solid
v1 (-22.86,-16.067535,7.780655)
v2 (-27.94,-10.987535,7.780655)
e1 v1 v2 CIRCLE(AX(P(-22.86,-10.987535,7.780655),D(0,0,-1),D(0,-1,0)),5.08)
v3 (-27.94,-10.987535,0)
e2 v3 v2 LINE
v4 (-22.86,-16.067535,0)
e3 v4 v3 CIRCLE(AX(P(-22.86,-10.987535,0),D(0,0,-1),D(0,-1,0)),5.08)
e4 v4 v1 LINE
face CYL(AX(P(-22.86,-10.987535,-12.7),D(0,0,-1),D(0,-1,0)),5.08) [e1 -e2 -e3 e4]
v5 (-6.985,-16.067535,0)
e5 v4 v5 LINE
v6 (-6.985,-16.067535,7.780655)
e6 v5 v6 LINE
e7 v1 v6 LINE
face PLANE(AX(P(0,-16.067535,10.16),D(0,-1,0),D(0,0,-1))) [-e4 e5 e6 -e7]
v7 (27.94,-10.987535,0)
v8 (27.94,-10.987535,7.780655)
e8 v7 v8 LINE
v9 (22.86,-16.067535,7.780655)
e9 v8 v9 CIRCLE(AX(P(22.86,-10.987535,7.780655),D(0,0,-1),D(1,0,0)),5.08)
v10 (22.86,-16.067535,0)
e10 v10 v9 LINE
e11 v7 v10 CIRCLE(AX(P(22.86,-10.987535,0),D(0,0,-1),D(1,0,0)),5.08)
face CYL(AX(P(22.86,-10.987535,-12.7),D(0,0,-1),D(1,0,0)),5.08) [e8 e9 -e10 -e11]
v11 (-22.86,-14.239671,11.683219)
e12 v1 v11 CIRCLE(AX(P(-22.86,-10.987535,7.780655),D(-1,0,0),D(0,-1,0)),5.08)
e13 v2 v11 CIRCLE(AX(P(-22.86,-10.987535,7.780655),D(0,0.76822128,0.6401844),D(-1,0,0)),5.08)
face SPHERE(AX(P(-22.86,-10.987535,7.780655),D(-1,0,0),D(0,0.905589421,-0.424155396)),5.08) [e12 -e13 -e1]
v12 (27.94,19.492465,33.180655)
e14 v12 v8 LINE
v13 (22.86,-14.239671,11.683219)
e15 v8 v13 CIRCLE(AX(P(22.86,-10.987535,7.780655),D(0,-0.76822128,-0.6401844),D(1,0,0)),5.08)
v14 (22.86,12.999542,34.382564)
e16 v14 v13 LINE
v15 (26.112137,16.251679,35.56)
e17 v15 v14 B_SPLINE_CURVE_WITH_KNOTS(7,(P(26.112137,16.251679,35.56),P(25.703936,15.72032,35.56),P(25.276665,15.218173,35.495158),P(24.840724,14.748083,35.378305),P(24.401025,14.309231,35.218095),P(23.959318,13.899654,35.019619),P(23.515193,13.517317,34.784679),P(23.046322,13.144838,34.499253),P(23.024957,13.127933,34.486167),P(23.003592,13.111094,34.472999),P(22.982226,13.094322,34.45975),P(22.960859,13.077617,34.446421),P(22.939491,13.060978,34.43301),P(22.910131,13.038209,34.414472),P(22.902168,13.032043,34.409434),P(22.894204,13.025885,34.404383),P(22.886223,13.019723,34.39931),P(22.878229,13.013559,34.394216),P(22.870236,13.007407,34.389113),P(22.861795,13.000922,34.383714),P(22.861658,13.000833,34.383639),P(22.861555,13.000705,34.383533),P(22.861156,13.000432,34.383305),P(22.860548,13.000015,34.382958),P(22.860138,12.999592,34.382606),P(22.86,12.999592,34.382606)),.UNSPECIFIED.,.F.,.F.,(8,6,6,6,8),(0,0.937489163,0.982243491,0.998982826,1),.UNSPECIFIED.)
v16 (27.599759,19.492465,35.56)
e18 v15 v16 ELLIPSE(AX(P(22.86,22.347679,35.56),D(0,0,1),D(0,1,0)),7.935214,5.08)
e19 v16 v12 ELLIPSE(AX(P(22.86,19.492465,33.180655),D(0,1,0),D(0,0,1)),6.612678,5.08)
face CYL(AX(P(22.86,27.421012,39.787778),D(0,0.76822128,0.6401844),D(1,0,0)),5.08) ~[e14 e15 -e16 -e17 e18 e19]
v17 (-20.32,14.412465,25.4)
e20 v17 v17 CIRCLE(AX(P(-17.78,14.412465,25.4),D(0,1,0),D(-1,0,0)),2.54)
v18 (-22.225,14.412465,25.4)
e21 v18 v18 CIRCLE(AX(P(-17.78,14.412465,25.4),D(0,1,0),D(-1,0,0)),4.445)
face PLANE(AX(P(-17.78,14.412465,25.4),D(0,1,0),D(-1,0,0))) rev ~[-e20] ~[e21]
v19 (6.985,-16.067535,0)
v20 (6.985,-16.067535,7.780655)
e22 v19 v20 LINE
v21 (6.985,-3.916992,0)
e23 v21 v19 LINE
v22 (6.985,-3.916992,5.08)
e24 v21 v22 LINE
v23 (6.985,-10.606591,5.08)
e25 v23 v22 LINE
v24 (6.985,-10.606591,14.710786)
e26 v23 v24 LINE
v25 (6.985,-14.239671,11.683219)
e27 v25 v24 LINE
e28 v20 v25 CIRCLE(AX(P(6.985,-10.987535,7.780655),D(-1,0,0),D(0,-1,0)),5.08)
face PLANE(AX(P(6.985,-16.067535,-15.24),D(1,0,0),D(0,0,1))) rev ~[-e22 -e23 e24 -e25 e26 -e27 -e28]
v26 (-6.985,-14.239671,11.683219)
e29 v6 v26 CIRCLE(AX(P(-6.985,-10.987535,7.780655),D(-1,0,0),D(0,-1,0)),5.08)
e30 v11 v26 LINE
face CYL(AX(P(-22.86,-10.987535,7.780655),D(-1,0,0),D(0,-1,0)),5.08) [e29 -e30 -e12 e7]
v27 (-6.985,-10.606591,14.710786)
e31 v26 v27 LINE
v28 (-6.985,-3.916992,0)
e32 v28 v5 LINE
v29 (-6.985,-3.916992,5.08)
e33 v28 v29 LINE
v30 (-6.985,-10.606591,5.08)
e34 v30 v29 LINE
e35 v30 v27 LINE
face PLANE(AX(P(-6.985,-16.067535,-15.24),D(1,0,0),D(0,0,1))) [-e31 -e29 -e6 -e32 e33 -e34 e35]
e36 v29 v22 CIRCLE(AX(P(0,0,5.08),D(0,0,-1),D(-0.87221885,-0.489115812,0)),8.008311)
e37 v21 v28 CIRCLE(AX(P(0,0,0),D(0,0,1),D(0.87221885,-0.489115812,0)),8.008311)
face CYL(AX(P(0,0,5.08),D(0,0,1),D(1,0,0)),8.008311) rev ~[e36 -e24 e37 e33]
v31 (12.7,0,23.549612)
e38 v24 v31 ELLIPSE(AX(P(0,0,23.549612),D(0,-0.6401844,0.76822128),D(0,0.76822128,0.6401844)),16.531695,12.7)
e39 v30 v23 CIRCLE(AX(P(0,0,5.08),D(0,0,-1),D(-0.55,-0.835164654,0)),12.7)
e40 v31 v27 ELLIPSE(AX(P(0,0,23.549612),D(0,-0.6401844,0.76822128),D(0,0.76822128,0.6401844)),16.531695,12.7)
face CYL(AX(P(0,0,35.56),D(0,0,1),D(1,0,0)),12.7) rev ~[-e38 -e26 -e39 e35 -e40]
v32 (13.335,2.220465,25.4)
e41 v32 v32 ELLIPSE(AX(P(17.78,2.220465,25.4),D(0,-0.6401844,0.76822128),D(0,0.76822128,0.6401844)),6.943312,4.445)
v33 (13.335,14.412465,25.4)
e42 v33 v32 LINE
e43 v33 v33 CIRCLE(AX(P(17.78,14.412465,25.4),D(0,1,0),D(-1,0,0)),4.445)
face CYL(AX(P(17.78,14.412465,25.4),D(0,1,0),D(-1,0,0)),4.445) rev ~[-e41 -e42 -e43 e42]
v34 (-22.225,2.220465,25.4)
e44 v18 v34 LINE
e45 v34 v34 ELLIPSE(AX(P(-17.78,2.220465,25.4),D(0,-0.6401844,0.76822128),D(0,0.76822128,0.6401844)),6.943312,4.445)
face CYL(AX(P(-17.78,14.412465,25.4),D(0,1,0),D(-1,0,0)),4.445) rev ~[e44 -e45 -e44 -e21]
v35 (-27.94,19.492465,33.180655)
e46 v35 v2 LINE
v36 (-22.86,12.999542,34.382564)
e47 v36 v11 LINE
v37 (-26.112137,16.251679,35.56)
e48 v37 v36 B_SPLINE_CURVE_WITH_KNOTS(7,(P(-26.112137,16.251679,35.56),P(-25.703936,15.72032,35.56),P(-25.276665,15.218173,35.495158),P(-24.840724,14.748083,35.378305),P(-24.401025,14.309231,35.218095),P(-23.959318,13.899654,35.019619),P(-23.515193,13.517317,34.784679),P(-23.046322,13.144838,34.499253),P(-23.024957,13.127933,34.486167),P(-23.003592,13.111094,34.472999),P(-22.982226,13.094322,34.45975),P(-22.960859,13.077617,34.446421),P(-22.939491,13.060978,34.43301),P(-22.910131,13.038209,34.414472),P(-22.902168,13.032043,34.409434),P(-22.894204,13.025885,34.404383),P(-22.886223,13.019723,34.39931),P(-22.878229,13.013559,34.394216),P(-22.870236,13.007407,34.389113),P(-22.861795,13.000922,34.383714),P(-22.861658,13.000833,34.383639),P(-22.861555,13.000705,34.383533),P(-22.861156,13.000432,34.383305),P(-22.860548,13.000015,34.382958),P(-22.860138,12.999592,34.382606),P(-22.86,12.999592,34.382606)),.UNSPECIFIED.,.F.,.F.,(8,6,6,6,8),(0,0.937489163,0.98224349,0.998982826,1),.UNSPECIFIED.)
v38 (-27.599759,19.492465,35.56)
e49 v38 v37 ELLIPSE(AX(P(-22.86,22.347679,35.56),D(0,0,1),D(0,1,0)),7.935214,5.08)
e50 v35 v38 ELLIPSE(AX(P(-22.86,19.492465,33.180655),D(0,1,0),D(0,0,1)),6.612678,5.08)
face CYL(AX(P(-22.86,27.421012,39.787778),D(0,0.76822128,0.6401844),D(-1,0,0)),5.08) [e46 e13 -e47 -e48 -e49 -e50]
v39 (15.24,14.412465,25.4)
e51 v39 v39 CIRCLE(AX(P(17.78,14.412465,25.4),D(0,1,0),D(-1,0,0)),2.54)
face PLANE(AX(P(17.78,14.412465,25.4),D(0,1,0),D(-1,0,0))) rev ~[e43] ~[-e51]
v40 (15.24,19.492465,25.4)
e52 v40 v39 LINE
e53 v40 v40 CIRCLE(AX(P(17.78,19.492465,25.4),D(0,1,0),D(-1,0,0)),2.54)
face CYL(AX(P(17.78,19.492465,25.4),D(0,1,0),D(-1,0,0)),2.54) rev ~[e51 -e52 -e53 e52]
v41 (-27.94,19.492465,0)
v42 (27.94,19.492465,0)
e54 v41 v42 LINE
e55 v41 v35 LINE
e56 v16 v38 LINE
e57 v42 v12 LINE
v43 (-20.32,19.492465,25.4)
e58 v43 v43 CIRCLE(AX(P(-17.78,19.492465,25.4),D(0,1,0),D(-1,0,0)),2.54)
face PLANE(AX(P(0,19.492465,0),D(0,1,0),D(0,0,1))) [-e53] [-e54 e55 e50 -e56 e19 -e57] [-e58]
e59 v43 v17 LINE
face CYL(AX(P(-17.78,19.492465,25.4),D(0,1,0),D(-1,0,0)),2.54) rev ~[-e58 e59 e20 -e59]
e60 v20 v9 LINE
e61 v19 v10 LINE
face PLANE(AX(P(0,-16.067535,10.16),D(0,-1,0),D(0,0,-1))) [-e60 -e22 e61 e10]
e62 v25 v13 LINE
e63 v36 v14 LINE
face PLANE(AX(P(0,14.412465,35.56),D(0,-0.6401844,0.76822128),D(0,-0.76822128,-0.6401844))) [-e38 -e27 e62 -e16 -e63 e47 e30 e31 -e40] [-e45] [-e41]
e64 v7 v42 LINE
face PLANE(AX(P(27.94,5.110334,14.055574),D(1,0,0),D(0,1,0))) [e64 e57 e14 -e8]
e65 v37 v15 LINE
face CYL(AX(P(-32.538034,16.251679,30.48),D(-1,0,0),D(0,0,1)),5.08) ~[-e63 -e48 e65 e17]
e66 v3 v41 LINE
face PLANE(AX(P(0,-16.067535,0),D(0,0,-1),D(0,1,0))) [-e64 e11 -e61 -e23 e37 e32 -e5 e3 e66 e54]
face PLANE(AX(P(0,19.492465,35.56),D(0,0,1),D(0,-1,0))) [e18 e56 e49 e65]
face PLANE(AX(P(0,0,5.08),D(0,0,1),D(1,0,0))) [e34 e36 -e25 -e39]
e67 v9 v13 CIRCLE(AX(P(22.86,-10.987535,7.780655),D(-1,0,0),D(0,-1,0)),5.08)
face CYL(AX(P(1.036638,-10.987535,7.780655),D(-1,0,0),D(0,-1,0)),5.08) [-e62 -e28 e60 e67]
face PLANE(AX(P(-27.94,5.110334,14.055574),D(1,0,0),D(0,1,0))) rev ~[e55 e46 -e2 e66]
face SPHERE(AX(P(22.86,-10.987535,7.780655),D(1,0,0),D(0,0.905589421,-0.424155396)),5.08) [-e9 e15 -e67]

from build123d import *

# Parameters (mm, degrees)
F1_DEPTH     = 27.94
F2_R         = 12.7
F3_DEPTH     = 30.48
F4_R         = 8.0083112146
F5_DEPTH     = 50.8
F6_W         = 13.97
F6_H         = 30.48
F7_DEPTH     = 19.05
F8_T1_DEPTH  = 21.823361814
F8_T3_DEPTH  = 21.823361814
F8_T5_DEPTH  = 20.4806552744
F8_T7_DEPTH  = 49.996723628
F8_T9_DEPTH  = 65.0760683536
F8_T14_DEPTH = 5.08
F8_T20_DEPTH = 5.08
F9_R         = 2.54
F10_DEPTH    = 20.321
F12_R        = 4.445
F13_DEPTH    = 25.4


# Not quite as in the source:
# - a fillet or chamfer that OpenCascade refuses, or shapes differently, is made with other operations: its cross-section is extruded or revolved along the edge and cut away or added


with BuildPart() as f1:
    # F0 (on Right) → F1 (new body, symmetric)
    with BuildSketch(Plane.YZ):
        Polygon((-16.0675346851, 10.16), (-16.0675346851, 0), (19.4924653149, 0), (19.4924653149, 35.56), (14.4124653149, 35.56), align=None)
    extrude(amount=F1_DEPTH, both=True)

    # F2 (on face) → F3 (cut)
    with BuildSketch(Plane.XY.offset(35.56)):
        Circle(F2_R)
    extrude(amount=-F3_DEPTH, mode=Mode.SUBTRACT)

    # F4 (on face) → F5 (cut)
    with BuildSketch(Plane.XY.offset(5.08)):
        Circle(F4_R)
    extrude(amount=-F5_DEPTH, mode=Mode.SUBTRACT)

    # F6 (on face) → F7 (cut)
    with BuildSketch(Plane.XZ.offset(16.0675346851)):
        Rectangle(F6_W, F6_H)
    extrude(amount=-F7_DEPTH, mode=Mode.SUBTRACT)

    # F8: fillet of radius 5.08 on 7 edges, made by hand

    # F8_s2 → F8_t1 (cut)
    with BuildSketch(Plane.YZ.offset(-22.86)):
        with BuildLine():
            ThreePointArc((-16.0675346851, 7.7806552744), (-15.587928945, 9.9353646873), (-14.2396714354, 11.6832193748))
            Line((-14.2396714354, 11.6832193748), (-16.0675346851, 10.16))
            Line((-16.0675346851, 10.16), (-16.0675346851, 7.7806552744))
        make_face()
    extrude(amount=F8_T1_DEPTH, mode=Mode.SUBTRACT)

    # F8_s4 → F8_t3 (cut)
    with BuildSketch(Plane.YZ.offset(1.036638186)):
        with BuildLine():
            ThreePointArc((-16.0675346851, 7.7806552744), (-15.587928945, 9.9353646873), (-14.2396714354, 11.6832193748))
            Line((-14.2396714354, 11.6832193748), (-16.0675346851, 10.16))
            Line((-16.0675346851, 10.16), (-16.0675346851, 7.7806552744))
        make_face()
    extrude(amount=F8_T3_DEPTH, mode=Mode.SUBTRACT)

    # F8_s6 → F8_t5 (cut)
    with BuildSketch(Plane.XY.offset(-12.7)):
        with BuildLine():
            ThreePointArc((27.94, -10.9875346851), (26.4521024484, -14.5796371336), (22.86, -16.0675346851))
            Line((22.86, -16.0675346851), (27.94, -16.0675346851))
            Line((27.94, -16.0675346851), (27.94, -10.9875346851))
        make_face()
        with BuildLine():
            ThreePointArc((-22.86, -16.0675346851), (-26.4521024484, -14.5796371336), (-27.94, -10.9875346851))
            Line((-27.94, -10.9875346851), (-27.94, -16.0675346851))
            Line((-27.94, -16.0675346851), (-22.86, -16.0675346851))
        make_face()
    extrude(amount=F8_T5_DEPTH, mode=Mode.SUBTRACT)

    # F8_s8 → F8_t7 (cut)
    with BuildSketch(Plane(origin=(0, 35.7506520761, 29.7922100634), x_dir=(1, 0, 0), z_dir=(0, -0.7682212796, -0.6401843997))):
        with BuildLine():
            ThreePointArc((27.94, 13.0113132472), (26.4521024484, 16.6034156956), (22.86, 18.0913132472))
            Line((22.86, 18.0913132472), (27.94, 18.0913132472))
            Line((27.94, 18.0913132472), (27.94, 13.0113132472))
        make_face()
        with BuildLine():
            ThreePointArc((-27.94, 13.0113132472), (-26.4521024484, 16.6034156956), (-22.86, 18.0913132472))
            Line((-22.86, 18.0913132472), (-27.94, 18.0913132472))
            Line((-27.94, 18.0913132472), (-27.94, 13.0113132472))
        make_face()
    extrude(amount=F8_T7_DEPTH, mode=Mode.SUBTRACT)

    # F8_s10 → F8_t9 (cut)
    with BuildSketch(Plane.YZ.offset(-32.5380341768)):
        with BuildLine():
            ThreePointArc((16.2516789856, 35.56), (14.5223186457, 35.2565796146), (12.9995422353, 34.3825641004))
            Line((12.9995422353, 34.3825641004), (14.4124653149, 35.56))
            Line((14.4124653149, 35.56), (16.2516789856, 35.56))
        make_face()
    extrude(amount=F8_T9_DEPTH, mode=Mode.SUBTRACT)


with BuildPart() as f8_tool12:
    # F8_s13 → F8_t14 (new body)
    with BuildSketch(Plane.YZ.offset(-22.86)):
        Polygon((-10.9875346851, 7.7806552744), (-14.2396714354, 11.6832193748), (-16.0675346851, 10.16), (-16.0675346851, 7.7806552744), align=None)
    extrude(amount=-F8_T14_DEPTH)

    # F8_s15 → F8_t16 (revolve, cut)
    with BuildSketch(Plane(origin=(-22.86, -10.9875346851, 7.7806552744), x_dir=(0, 0.9055894212, -0.4241553962), z_dir=(0, 0.4241553962, 0.9055894212))):
        with BuildLine():
            ThreePointArc((0, -5.08), (5.08, 0), (0, 5.08))
            Line((0, 5.08), (0, -5.08))
        make_face()
    revolve(axis=Axis((-22.86, -10.9875346851, 7.7806552744), (-1, 0, 0)), mode=Mode.SUBTRACT)


with BuildPart() as f1_1:
    add(f1.part)

    # F8_t11: cut F8_tool12
    add(f8_tool12.part, mode=Mode.SUBTRACT)


with BuildPart() as f8_tool18:
    # F8_s19 → F8_t20 (new body)
    with BuildSketch(Plane.YZ.offset(22.86)):
        Polygon((-10.9875346851, 7.7806552744), (-16.0675346851, 7.7806552744), (-16.0675346851, 10.16), (-14.2396714354, 11.6832193748), align=None)
    extrude(amount=F8_T20_DEPTH)

    # F8_s21 → F8_t22 (revolve, cut)
    with BuildSketch(Plane(origin=(22.86, -10.9875346851, 7.7806552744), x_dir=(0, 0.9055894212, -0.4241553962), z_dir=(0, -0.4241553962, -0.9055894212))):
        with BuildLine():
            ThreePointArc((0, -5.08), (5.08, 0), (0, 5.08))
            Line((0, 5.08), (0, -5.08))
        make_face()
    revolve(axis=Axis((22.86, -10.9875346851, 7.7806552744), (1, 0, 0)), mode=Mode.SUBTRACT)


with BuildPart() as f1_2:
    add(f1_1.part)

    # F8_t17: cut F8_tool18
    add(f8_tool18.part, mode=Mode.SUBTRACT)

    # F9 (on face) → F10 (cut, through all)
    with BuildSketch(Plane(origin=(0, 19.4924653149, 0), x_dir=(-1, 0, 0), z_dir=(0, 1, 0))):
        with Locations((-17.78, 25.4)):
            Circle(F9_R)
        with Locations((17.78, 25.4)):
            Circle(F9_R)
    extrude(amount=-F10_DEPTH, mode=Mode.SUBTRACT)

    # F12 (on offset) → F13 (cut)
    with BuildSketch(Plane(origin=(0, 14.4124653149, 0), x_dir=(-1, 0, 0), z_dir=(0, 1, 0))):
        with Locations((-17.78, 25.4)):
            Circle(F12_R)
        with Locations((17.78, 25.4)):
            Circle(F12_R)
    extrude(amount=-F13_DEPTH, mode=Mode.SUBTRACT)


solid = f1_2.part
